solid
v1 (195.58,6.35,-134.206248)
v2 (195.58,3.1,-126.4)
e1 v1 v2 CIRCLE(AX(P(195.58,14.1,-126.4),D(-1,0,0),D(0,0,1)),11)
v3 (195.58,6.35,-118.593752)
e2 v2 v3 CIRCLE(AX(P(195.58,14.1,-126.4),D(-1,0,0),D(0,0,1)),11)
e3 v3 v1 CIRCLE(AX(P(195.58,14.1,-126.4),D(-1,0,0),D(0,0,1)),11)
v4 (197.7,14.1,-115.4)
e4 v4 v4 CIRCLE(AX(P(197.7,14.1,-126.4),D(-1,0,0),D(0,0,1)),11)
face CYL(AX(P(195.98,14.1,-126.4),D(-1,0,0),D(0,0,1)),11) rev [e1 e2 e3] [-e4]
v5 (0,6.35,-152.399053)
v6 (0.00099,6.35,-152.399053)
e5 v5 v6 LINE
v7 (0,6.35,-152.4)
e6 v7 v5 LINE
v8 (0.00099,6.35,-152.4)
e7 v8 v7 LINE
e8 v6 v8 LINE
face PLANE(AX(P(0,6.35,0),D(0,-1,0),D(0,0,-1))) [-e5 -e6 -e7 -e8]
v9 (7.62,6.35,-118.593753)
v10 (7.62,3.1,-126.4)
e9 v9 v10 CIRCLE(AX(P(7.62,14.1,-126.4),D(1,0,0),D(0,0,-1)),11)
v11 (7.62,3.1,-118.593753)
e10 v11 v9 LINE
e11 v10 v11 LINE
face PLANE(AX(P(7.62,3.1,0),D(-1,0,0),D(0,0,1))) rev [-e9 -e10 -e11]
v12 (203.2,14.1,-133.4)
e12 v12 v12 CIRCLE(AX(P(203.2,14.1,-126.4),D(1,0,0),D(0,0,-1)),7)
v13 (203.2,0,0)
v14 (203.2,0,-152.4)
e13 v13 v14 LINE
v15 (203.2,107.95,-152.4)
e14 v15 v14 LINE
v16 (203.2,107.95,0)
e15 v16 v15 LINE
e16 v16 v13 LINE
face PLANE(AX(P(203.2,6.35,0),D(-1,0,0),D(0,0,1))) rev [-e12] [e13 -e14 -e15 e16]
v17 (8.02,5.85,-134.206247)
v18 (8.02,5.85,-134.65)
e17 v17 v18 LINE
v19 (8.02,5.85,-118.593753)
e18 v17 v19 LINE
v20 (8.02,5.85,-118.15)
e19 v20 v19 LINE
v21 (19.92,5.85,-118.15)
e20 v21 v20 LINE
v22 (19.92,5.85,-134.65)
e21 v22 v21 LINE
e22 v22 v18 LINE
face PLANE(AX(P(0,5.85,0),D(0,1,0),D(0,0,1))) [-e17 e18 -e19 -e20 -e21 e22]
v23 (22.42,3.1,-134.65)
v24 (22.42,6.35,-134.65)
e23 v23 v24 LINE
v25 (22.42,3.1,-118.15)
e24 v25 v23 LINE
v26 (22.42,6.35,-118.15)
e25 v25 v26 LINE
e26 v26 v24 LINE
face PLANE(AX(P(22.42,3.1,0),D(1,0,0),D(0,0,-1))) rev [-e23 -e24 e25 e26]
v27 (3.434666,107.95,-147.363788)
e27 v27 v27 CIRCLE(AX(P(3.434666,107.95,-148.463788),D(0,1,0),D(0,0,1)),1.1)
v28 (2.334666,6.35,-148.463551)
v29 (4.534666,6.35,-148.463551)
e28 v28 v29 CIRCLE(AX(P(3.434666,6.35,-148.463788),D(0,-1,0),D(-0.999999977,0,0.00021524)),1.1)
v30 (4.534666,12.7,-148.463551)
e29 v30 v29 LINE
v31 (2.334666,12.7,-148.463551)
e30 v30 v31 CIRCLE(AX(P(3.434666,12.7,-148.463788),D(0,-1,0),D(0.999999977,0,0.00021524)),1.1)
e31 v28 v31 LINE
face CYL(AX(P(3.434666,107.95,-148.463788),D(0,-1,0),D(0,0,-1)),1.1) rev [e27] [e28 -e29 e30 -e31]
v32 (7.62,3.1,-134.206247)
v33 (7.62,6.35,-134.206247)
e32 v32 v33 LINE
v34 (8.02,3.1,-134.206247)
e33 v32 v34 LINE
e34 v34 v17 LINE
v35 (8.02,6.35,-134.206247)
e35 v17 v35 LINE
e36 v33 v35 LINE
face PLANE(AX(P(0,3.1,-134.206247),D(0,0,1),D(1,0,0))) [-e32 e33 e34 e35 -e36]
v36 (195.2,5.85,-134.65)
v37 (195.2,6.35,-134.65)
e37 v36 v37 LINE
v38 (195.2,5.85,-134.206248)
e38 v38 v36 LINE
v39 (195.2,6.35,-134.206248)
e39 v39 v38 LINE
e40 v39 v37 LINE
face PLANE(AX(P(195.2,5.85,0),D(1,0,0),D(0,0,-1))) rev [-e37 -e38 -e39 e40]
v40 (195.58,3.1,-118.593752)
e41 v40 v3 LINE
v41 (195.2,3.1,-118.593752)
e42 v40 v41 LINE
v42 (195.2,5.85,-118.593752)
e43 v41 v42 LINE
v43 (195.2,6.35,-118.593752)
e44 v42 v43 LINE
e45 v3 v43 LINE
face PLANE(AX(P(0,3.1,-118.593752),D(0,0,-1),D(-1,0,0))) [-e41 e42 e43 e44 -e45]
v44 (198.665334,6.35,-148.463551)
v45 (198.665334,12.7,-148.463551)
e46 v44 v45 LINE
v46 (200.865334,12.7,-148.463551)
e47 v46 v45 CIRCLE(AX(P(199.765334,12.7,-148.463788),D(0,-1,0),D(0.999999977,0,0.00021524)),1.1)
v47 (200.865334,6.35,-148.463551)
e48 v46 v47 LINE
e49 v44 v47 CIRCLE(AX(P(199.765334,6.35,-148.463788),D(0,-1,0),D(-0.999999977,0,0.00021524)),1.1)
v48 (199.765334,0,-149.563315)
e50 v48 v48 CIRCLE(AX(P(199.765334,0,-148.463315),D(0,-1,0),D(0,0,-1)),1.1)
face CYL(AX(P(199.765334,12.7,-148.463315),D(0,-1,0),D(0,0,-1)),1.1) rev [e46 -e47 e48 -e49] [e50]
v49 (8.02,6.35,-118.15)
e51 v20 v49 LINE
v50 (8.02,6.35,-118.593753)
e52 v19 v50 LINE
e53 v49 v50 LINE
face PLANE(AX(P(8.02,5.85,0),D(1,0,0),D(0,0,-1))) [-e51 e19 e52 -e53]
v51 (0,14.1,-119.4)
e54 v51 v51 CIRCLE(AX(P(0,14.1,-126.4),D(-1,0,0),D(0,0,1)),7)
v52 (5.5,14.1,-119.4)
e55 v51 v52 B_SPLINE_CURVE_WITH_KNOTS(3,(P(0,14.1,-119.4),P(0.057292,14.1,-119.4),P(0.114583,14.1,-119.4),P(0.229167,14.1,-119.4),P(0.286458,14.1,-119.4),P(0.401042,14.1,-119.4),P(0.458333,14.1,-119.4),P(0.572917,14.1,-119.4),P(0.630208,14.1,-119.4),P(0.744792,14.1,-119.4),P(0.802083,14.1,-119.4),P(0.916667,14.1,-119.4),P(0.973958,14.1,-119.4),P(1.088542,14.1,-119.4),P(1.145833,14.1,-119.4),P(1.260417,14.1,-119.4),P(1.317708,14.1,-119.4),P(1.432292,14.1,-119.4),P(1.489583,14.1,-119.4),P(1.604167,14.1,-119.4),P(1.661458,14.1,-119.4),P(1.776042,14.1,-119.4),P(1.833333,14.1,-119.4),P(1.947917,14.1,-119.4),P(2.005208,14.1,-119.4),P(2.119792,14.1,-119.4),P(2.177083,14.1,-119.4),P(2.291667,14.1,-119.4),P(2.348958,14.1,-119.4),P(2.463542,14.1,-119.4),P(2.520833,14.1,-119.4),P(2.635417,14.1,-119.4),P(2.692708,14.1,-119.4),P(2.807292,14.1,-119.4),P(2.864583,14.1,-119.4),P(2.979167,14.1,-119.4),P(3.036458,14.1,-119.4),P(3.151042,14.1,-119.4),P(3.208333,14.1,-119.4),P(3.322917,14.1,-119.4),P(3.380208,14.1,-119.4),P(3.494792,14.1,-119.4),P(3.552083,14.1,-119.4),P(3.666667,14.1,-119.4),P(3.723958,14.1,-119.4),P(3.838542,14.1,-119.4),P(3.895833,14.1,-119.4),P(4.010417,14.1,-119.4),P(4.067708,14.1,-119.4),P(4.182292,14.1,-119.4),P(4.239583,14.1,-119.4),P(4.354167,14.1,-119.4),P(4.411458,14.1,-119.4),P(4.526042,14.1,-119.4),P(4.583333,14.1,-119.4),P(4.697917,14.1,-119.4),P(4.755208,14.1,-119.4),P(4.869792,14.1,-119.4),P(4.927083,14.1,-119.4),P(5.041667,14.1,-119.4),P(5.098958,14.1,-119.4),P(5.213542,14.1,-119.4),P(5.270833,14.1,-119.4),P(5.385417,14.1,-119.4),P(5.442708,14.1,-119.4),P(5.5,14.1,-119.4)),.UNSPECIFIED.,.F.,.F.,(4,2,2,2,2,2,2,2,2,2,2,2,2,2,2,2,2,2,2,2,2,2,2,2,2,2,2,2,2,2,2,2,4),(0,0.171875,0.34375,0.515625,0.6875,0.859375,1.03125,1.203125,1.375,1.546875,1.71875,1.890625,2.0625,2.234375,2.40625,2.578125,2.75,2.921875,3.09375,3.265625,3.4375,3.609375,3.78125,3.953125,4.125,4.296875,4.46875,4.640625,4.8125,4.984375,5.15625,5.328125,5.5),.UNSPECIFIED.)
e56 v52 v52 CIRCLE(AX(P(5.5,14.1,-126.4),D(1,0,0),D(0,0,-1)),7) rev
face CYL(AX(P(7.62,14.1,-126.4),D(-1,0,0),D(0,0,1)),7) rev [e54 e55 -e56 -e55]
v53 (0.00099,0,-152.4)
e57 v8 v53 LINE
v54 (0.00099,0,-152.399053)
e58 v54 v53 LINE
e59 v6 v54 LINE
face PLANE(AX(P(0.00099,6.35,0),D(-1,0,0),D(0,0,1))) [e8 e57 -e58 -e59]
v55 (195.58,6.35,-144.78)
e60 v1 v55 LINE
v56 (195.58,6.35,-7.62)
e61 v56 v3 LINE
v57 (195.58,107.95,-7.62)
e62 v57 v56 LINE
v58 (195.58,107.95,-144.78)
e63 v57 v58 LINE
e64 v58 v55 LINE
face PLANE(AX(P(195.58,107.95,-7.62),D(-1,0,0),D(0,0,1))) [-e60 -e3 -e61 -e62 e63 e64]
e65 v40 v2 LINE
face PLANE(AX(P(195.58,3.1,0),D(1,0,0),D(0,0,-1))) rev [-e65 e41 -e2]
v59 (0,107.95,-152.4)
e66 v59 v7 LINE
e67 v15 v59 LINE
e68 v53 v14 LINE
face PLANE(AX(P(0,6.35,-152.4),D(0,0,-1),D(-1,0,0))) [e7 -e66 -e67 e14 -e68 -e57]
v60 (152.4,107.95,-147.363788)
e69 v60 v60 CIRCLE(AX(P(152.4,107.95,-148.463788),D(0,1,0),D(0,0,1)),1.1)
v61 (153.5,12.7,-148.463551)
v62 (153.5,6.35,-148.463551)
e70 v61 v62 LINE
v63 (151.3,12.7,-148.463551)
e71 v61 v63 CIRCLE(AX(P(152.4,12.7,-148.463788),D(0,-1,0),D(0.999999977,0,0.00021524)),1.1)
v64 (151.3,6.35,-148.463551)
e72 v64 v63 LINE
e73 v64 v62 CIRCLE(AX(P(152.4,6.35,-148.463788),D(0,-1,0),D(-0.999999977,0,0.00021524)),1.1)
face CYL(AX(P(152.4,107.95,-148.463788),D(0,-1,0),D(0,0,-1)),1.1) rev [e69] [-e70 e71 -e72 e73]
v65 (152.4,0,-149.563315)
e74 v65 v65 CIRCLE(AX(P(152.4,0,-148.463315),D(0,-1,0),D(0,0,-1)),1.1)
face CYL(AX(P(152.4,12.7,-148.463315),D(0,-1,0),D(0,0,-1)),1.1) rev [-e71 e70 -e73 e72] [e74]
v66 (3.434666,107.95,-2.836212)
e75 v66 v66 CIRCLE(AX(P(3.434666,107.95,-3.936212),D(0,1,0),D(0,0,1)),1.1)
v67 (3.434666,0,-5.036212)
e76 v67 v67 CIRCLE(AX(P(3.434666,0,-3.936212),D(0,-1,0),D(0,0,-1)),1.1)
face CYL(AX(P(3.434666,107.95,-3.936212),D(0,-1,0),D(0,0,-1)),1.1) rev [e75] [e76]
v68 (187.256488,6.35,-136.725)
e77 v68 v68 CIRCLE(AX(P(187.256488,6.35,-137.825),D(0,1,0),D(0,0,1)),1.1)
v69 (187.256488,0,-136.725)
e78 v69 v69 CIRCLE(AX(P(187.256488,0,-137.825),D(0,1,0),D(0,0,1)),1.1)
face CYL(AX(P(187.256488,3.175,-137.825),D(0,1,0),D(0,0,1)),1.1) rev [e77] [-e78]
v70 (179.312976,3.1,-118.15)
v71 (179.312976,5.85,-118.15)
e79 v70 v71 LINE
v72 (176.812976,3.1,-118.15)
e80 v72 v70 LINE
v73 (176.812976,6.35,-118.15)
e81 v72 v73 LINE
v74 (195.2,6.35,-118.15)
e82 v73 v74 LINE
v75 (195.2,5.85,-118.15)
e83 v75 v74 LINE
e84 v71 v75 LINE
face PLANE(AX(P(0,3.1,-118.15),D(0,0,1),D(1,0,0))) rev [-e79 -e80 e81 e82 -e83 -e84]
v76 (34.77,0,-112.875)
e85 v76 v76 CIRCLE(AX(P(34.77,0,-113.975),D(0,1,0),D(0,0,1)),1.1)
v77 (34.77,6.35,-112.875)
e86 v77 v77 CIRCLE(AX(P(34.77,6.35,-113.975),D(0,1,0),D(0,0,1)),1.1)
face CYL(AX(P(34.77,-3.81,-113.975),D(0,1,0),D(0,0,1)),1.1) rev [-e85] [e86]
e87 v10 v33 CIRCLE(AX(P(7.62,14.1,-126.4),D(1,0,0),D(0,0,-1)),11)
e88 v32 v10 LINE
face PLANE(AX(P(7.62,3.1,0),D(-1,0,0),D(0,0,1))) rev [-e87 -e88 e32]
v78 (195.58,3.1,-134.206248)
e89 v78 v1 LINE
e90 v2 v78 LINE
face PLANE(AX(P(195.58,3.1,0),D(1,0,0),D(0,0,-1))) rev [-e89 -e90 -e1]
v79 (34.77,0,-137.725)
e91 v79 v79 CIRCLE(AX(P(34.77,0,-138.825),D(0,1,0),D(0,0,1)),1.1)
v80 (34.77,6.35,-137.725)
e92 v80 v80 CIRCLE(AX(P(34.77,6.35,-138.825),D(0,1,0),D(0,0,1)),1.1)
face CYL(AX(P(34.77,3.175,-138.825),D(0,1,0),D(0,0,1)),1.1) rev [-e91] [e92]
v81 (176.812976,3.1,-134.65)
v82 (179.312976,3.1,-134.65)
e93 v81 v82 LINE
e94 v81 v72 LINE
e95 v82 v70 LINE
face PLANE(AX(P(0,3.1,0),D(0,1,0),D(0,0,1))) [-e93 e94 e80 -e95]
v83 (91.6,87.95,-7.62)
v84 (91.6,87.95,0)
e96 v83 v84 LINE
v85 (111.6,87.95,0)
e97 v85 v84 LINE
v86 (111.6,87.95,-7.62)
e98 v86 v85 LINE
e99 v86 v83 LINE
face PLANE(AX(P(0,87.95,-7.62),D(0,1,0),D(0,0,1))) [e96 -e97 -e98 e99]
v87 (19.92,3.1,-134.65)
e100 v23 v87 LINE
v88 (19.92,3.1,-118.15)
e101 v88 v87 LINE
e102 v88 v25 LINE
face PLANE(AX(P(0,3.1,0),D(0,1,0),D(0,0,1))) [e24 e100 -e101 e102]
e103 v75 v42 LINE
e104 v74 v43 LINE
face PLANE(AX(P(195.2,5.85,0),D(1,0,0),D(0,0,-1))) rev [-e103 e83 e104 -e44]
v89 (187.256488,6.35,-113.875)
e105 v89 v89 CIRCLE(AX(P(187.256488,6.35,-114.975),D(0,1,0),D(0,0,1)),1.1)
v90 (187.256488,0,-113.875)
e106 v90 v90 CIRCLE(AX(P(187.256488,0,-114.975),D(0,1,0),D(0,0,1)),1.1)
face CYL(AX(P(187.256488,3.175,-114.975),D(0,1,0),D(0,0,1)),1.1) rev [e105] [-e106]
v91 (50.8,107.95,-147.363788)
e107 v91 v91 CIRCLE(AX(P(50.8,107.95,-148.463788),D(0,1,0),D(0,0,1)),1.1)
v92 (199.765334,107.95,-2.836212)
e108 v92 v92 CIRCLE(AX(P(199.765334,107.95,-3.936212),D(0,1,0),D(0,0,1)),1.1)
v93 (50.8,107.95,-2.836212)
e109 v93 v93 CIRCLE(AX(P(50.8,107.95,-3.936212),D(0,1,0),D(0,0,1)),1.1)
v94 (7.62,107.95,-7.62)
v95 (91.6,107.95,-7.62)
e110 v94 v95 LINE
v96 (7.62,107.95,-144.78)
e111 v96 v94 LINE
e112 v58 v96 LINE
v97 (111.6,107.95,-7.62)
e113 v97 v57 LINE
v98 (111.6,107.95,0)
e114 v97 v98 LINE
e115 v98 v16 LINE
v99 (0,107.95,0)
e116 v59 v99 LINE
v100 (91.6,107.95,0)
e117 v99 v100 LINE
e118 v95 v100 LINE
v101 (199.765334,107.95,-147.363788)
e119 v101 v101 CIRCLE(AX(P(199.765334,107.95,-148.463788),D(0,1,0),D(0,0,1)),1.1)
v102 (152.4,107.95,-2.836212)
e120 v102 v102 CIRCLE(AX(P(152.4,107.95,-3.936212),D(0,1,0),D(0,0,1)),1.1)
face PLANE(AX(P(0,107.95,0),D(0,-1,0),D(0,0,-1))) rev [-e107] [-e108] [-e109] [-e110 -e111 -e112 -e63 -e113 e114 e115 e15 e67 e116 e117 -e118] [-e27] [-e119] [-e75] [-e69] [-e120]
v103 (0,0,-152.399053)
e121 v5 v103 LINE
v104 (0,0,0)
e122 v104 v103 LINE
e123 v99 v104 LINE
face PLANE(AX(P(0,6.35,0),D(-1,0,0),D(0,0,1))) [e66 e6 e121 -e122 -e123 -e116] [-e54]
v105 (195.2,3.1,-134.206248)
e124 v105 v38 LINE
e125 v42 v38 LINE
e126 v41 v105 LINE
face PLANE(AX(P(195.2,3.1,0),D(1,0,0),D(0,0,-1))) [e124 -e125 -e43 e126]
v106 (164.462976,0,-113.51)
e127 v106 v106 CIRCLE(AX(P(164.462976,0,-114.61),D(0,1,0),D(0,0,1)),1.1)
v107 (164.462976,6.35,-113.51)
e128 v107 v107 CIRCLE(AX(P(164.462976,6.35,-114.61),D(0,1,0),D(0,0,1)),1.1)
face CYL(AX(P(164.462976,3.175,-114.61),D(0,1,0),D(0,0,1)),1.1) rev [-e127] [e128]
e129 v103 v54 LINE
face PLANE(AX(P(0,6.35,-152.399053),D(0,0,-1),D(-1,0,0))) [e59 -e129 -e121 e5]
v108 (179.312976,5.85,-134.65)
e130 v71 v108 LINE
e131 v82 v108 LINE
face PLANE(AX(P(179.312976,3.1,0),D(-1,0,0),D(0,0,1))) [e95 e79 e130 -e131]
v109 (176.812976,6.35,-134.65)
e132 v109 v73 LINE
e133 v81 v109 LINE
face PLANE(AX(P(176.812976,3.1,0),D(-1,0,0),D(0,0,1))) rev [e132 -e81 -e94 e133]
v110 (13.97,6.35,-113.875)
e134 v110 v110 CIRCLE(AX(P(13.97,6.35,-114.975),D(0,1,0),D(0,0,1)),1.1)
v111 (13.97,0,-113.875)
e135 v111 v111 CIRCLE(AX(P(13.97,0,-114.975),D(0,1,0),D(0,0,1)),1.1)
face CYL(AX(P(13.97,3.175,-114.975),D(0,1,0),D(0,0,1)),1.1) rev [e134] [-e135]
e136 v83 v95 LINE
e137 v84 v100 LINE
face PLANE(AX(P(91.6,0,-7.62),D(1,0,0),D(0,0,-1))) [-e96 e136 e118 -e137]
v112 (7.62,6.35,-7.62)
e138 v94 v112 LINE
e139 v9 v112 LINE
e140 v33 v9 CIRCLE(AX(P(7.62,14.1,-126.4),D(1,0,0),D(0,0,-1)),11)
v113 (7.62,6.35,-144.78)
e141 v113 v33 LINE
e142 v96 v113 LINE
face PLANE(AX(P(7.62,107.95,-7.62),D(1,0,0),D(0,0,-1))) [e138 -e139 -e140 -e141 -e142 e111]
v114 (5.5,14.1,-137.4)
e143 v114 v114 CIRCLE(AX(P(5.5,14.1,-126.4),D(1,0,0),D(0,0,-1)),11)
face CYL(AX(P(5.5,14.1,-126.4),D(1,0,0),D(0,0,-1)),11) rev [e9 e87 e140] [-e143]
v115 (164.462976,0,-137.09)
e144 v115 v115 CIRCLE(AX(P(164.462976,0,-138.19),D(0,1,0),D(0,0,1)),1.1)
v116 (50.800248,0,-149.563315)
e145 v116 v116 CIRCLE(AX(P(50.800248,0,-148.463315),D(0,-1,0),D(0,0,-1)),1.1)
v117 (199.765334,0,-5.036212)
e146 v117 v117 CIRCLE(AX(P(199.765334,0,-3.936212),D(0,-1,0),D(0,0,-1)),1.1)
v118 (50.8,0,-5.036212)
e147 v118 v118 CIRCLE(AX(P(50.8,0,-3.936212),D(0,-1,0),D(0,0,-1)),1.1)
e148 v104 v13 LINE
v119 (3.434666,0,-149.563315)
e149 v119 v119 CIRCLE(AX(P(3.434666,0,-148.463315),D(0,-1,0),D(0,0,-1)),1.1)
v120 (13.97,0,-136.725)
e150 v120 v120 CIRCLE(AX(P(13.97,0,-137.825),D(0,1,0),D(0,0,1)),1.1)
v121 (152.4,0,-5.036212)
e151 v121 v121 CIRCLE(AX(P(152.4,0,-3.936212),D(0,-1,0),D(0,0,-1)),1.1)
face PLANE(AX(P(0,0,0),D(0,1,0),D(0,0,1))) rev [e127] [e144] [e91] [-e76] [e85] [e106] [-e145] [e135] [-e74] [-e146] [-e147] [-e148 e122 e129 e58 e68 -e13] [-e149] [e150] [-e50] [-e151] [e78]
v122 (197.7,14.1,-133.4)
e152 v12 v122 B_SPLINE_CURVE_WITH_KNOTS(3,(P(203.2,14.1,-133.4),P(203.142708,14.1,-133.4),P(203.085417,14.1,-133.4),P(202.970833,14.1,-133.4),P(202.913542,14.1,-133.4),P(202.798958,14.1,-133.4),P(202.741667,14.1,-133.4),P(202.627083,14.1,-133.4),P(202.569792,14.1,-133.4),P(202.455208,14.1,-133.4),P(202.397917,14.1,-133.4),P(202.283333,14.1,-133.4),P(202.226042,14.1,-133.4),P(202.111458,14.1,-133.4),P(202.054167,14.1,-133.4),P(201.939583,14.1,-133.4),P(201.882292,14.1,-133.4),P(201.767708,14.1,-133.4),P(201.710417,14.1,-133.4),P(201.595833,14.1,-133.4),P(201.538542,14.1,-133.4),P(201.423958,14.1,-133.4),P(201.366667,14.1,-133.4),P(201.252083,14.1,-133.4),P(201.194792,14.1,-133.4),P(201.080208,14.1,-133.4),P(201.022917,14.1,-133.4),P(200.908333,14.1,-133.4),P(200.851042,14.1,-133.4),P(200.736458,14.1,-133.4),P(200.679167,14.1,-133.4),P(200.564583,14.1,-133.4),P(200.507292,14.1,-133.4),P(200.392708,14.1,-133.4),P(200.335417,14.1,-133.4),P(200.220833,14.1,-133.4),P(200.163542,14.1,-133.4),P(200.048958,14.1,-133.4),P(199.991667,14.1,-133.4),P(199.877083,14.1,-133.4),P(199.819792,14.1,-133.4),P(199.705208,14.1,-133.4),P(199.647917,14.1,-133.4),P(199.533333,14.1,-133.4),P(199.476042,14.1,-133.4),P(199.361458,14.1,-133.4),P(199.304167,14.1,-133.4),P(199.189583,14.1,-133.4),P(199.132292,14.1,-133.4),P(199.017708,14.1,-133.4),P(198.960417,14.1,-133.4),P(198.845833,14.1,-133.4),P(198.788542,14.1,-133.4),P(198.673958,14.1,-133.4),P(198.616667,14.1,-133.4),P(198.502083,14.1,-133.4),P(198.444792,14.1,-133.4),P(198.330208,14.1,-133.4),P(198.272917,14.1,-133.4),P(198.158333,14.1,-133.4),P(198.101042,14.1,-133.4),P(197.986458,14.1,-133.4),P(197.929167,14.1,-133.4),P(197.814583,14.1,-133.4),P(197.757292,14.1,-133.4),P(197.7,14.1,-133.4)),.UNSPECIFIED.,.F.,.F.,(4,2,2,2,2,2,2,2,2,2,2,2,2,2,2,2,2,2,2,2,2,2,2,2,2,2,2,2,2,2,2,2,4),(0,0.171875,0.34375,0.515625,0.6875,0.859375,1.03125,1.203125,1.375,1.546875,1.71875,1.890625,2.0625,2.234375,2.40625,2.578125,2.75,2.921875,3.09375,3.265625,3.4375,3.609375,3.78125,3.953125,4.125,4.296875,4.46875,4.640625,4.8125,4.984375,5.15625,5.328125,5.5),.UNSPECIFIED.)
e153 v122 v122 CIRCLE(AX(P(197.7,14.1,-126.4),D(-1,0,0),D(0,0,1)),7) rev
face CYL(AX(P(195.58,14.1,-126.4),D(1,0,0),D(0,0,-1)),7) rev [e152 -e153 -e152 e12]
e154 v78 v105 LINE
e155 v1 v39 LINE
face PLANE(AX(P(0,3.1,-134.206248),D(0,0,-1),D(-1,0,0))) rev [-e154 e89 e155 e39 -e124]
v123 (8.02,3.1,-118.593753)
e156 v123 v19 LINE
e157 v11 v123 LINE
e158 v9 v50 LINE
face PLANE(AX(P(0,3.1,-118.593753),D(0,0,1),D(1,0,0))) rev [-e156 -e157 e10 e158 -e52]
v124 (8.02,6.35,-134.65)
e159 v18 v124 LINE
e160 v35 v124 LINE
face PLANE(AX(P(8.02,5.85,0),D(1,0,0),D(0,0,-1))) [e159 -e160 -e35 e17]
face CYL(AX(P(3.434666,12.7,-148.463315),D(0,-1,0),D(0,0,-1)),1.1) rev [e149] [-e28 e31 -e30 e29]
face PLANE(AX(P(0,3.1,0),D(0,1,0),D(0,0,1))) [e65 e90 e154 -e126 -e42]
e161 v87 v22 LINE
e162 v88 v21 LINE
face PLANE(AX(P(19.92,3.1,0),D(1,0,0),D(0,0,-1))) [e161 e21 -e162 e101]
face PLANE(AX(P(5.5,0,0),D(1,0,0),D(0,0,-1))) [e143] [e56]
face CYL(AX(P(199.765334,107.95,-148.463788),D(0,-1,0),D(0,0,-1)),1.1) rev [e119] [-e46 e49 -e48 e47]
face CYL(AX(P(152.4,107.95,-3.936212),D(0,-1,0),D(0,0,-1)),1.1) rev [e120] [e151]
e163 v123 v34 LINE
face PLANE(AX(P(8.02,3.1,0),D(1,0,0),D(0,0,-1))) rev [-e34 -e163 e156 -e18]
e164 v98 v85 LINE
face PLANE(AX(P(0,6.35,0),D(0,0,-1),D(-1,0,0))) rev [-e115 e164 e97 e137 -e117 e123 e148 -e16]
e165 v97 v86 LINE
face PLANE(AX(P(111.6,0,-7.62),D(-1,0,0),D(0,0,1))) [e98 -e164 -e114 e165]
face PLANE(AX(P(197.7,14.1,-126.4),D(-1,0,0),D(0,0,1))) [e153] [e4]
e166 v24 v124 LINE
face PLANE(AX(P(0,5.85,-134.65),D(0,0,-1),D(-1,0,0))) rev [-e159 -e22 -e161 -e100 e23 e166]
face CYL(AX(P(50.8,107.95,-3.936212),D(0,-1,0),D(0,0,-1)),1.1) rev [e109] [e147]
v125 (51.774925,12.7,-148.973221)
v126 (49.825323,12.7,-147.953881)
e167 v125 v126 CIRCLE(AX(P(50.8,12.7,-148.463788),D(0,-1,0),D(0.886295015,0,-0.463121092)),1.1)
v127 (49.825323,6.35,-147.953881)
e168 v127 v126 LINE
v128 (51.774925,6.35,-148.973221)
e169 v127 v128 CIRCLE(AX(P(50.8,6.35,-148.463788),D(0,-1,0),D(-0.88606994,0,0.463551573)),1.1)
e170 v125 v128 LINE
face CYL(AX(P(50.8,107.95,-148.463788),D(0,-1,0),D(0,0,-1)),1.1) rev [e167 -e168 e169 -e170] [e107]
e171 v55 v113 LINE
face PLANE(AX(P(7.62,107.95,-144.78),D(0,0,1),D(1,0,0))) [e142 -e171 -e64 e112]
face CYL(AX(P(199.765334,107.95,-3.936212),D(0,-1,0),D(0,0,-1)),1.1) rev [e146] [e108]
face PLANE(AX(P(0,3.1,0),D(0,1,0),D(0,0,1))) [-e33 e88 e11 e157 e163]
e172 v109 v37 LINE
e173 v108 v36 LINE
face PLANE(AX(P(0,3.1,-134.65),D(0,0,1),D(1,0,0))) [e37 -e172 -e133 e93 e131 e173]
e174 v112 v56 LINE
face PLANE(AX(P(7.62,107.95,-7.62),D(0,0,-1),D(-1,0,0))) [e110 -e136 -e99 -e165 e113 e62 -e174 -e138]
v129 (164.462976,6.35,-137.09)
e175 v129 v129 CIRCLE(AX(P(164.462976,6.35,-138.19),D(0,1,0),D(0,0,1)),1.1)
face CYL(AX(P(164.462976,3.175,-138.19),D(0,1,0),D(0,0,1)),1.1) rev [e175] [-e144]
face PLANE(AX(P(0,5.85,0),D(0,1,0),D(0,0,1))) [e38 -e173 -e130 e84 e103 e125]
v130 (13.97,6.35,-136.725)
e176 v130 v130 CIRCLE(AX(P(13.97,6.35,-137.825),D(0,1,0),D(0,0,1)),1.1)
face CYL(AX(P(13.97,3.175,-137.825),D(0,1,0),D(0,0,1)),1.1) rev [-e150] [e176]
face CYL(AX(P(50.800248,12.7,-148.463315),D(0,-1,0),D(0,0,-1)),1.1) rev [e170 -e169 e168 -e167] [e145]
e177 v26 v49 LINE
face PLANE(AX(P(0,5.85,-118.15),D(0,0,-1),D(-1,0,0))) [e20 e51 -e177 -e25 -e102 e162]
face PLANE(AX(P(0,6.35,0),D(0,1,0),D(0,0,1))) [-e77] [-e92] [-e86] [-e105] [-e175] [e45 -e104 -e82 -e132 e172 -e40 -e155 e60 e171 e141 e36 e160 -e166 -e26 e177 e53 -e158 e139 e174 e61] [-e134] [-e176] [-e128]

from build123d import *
from build123d.topology import SkipClean

# Parameters (mm, degrees)
BOSS_EXTRUDE1_DEPTH     = 6.35
SKETCH2_W               = 203.2
SKETCH2_H               = 152.4
SKETCH2_R               = 1.1
SKETCH2_W_2             = 187.96
SKETCH2_H_2             = 137.16
BOSS_EXTRUDE2_DEPTH     = 101.6
SKETCH3_R               = 1.1
CUT_EXTRUDE1_DEPTH      = 12.7
CUT_EXTRUDE2_DEPTH      = 7.62
SKETCH6_R               = 11
CUT_EXTRUDE3_DEPTH      = 0.4
CUT_EXTRUDE6_DEPTH      = 3.25
SKETCH6_3_R             = 11
CUT_EXTRUDE16_DEPTH     = 2.12
CUT_EXTRUDE17_DEPTH     = 3.25
CUT_EXTRUDE18_DEPTH     = 0.5
SKETCH7_8_R             = 1.1
CUT_EXTRUDE10_DEPTH     = 3.175
CUT_EXTRUDE22_START     = -7.62
CUT_EXTRUDE22_DEPTH     = 7.62
CUT_EXTRUDE24_DEPTH     = 2.12
SKETCH20_W              = 0.4
SKETCH20_H              = 15.612494996
CUT_EXTRUDE26_DEPTH     = 3.25
CUT_EXTRUDE27_DEPTH     = 0.5
CUT_EXTRUDE28_DEPTH     = 3.25
SKETCH20_7_R            = 1.1
CUT_EXTRUDE29_DEPTH     = 3.175
SKETCH21_W              = 10
SKETCH21_H              = 20
CUT_EXTRUDE31_DEPTH     = 7.62
CUT_EXTRUDE32_START     = -6.35
CUT_EXTRUDE32_OUTLINE_R = 1.1
CUT_EXTRUDE32_DEPTH     = 3.175
CUT_EXTRUDE33_START     = -6.35
CUT_EXTRUDE33_OUTLINE_R = 1.1
CUT_EXTRUDE33_DEPTH     = 3.175
SKETCH20_9_R            = 1.1
CUT_EXTRUDE34_DEPTH     = 10.16


# Read off the part's stored shape, not the designer's step: Cut-Extrude32, Cut-Extrude33
with BuildPart() as part:
    # Sketch1 → Boss-Extrude1 (new body)
    with BuildSketch(Plane(origin=(0, 0, 0), x_dir=(1, 0, 0), z_dir=(0, 1, 0))):
        Polygon((0.000990329, 152.399052943), (0, 152.399052943), (0, 0), (203.2, 0), (203.2, 152.4), (0.000990329, 152.4), align=None)
    extrude(amount=BOSS_EXTRUDE1_DEPTH)

    # Sketch2 → Boss-Extrude2 (add)
    with BuildSketch(Plane(origin=(0, 6.35, 0), x_dir=(1, 0, 0), z_dir=(0, 1, 0))):
        with Locations((101.6, 76.2)):
            Rectangle(SKETCH2_W, SKETCH2_H)
        with Locations(Location((3.434665978, 148.463788162, 0), (0, 0, 270))):
            Circle(SKETCH2_R, mode=Mode.SUBTRACT)
        with Locations(Location((50.8, 148.463788162, 0), (0, 0, 270))):
            Circle(SKETCH2_R, mode=Mode.SUBTRACT)
        with Locations(Location((199.765334022, 148.463788162, 0), (0, 0, 270))):
            Circle(SKETCH2_R, mode=Mode.SUBTRACT)
        with Locations(Location((152.4, 148.463788162, 0), (0, 0, 270))):
            Circle(SKETCH2_R, mode=Mode.SUBTRACT)
        with Locations(Location((3.434665978, 3.936211838, 0), (0, 0, 270))):
            Circle(SKETCH2_R, mode=Mode.SUBTRACT)
        with Locations(Location((50.8, 3.936211838, 0), (0, 0, 270))):
            Circle(SKETCH2_R, mode=Mode.SUBTRACT)
        with Locations(Location((199.765334022, 3.936211838, 0), (0, 0, 270))):
            Circle(SKETCH2_R, mode=Mode.SUBTRACT)
        with Locations(Location((152.4, 3.936211838, 0), (0, 0, 270))):
            Circle(SKETCH2_R, mode=Mode.SUBTRACT)
        with Locations((101.6, 76.2)):
            Rectangle(SKETCH2_W_2, SKETCH2_H_2, mode=Mode.SUBTRACT)
    extrude(amount=BOSS_EXTRUDE2_DEPTH)

    # Sketch3 → Cut-Extrude1 (cut)
    with SkipClean():  # the faces are left unmerged after this step: merging them gives an invalid solid
        with BuildSketch(Plane.XZ):
            with Locations(Location((3.434665978, -3.936211838, 0), (0, 0, 270))):
                Circle(SKETCH3_R)
            with Locations(Location((50.8, -3.936211838, 0), (0, 0, 270))):
                Circle(SKETCH3_R)
            with Locations(Location((152.4, -3.936211838, 0), (0, 0, 270))):
                Circle(SKETCH3_R)
            with Locations(Location((199.765334022, -3.936211838, 0), (0, 0, 270))):
                Circle(SKETCH3_R)
            with Locations(Location((50.800247582, -148.463314633, 0), (0, 0, 270))):
                Circle(SKETCH3_R)
            with Locations(Location((3.434665978, -148.463314633, 0), (0, 0, 270))):
                Circle(SKETCH3_R)
            with Locations(Location((152.4, -148.463314633, 0), (0, 0, 270))):
                Circle(SKETCH3_R)
            with Locations(Location((199.765334022, -148.463314633, 0), (0, 0, 270))):
                Circle(SKETCH3_R)
        extrude(amount=-CUT_EXTRUDE1_DEPTH, mode=Mode.SUBTRACT)
    add(part.part.scale(1), mode=Mode.REPLACE)  # the faces are merged on a copy

    # Sketch5 → Cut-Extrude2 (cut)
    with BuildSketch(Plane(origin=(203.2, 0, 0), x_dir=(0, 0, -1), z_dir=(1, 0, 0))):
        with BuildLine():
            ThreePointArc((126.4, 7.09999974), (131.349747468, 9.150252272), (133.4, 14.09999974))
            Line((133.4, 14.09999974), (126.4, 14.09999974))
            Line((126.4, 14.09999974), (126.4, 7.09999974))
        make_face()
        with BuildLine():
            Line((126.4, 14.09999974), (133.4, 14.09999974))
            ThreePointArc((133.4, 14.09999974), (121.450252532, 19.049747208), (126.4, 7.09999974))
            Line((126.4, 7.09999974), (126.4, 14.09999974))
        make_face()
    extrude(amount=-CUT_EXTRUDE2_DEPTH, mode=Mode.SUBTRACT)

    # Sketch6 → Cut-Extrude3 (cut)
    with BuildSketch(Plane.ZY.offset(-195.58)):
        with Locations((-126.4, 14.09999974)):
            Circle(SKETCH6_R)
    extrude(amount=-CUT_EXTRUDE3_DEPTH, mode=Mode.SUBTRACT)

    # Sketch7 → Cut-Extrude6 (cut)
    with BuildSketch(Plane(origin=(0, 6.35, 0), x_dir=(1, 0, 0), z_dir=(0, 1, 0))):
        Polygon((176.812976287, 126.4), (176.812976287, 118.15), (179.312976287, 118.15), (179.312976287, 126.4), (179.312976287, 134.65), (176.812976287, 134.65), align=None)
    extrude(amount=-CUT_EXTRUDE6_DEPTH, mode=Mode.SUBTRACT)

    # Sketch6<3> → Cut-Extrude16 (cut)
    with BuildSketch(Plane.ZY.offset(-195.58)):
        with Locations((-126.4, 14.09999974)):
            Circle(SKETCH6_3_R)
    extrude(amount=-CUT_EXTRUDE16_DEPTH, mode=Mode.SUBTRACT)

    # Sketch7<9> → Cut-Extrude17 (cut)
    with BuildSketch(Plane(origin=(0, 6.35, 0), x_dir=(1, 0, 0), z_dir=(0, 1, 0))):
        Polygon((195.2, 118.593752244), (195.2, 126.4), (195.2, 134.206247756), (195.58, 134.206247756), (195.58, 118.593752244), align=None)
    extrude(amount=-CUT_EXTRUDE17_DEPTH, mode=Mode.SUBTRACT)

    # Sketch7<10> → Cut-Extrude18 (cut)
    with BuildSketch(Plane(origin=(0, 6.35, 0), x_dir=(1, 0, 0), z_dir=(0, 1, 0))):
        Polygon((179.312976287, 118.15), (195.2, 118.15), (195.2, 118.593752244), (195.2, 126.4), (195.2, 134.206247756), (195.2, 134.65), (179.312976287, 134.65), (179.312976287, 126.4), align=None)
    extrude(amount=-CUT_EXTRUDE18_DEPTH, mode=Mode.SUBTRACT)

    # Sketch7<8> → Cut-Extrude10 (cut)
    with BuildSketch(Plane(origin=(0, 6.35, 0), x_dir=(1, 0, 0), z_dir=(0, 1, 0))):
        with Locations(Location((187.256488143, 137.825, 0), (0, 0, 270))):
            Circle(SKETCH7_8_R)
        with Locations(Location((187.256488143, 114.975, 0), (0, 0, 270))):
            Circle(SKETCH7_8_R)
        with Locations(Location((164.462976287, 138.19, 0), (0, 0, 270))):
            Circle(SKETCH7_8_R)
        with Locations(Location((164.462976287, 114.61, 0), (0, 0, 270))):
            Circle(SKETCH7_8_R)
    extrude(amount=-CUT_EXTRUDE10_DEPTH, mode=Mode.SUBTRACT)

    # Sketch17 → Cut-Extrude22 (cut)
    with BuildSketch(Plane.ZY.offset(CUT_EXTRUDE22_START)):
        with BuildLine():
            ThreePointArc((-119.4, 14.1), (-126.4, 21.1), (-133.4, 14.1))
            Line((-133.4, 14.1), (-126.4, 14.1))
            Line((-126.4, 14.1), (-126.4, 7.1))
            ThreePointArc((-126.4, 7.1), (-121.450252532, 9.150252532), (-119.4, 14.1))
        make_face()
        with BuildLine():
            Line((-126.4, 14.1), (-133.4, 14.1))
            ThreePointArc((-133.4, 14.1), (-131.349747468, 9.150252532), (-126.4, 7.1))
            Line((-126.4, 7.1), (-126.4, 14.1))
        make_face()
    extrude(amount=CUT_EXTRUDE22_DEPTH, mode=Mode.SUBTRACT)

    # Sketch18 → Cut-Extrude24 (cut)
    # profile 1 of 2: a face of its own
    with BuildSketch(Plane(origin=(7.62, 0, 0), x_dir=(0, 0, -1), z_dir=(1, 0, 0))):
        with BuildLine():
            ThreePointArc((134.206247498, 6.35), (136.570268494, 9.908861878), (137.4, 14.1))
            ThreePointArc((137.4, 14.1), (122.208861878, 24.270268494), (118.593752502, 6.35))
            Line((118.593752502, 6.35), (134.206247498, 6.35))
        make_face()
        with BuildLine():
            ThreePointArc((133.4, 14.1), (131.349747468, 9.150252532), (126.4, 7.1))
            ThreePointArc((126.4, 7.1), (119.4, 14.1), (126.4, 21.1))
            ThreePointArc((126.4, 21.1), (131.349747468, 19.049747468), (133.4, 14.1))
        make_face(mode=Mode.SUBTRACT)
    # profile 2 of 2: a face of its own
    with BuildSketch(Plane(origin=(7.62, 0, 0), x_dir=(0, 0, -1), z_dir=(1, 0, 0))):
        with BuildLine():
            Line((134.206247498, 6.35), (118.593752502, 6.35))
            ThreePointArc((118.593752502, 6.35), (126.4, 3.1), (134.206247498, 6.35))
        make_face()
    extrude(amount=-CUT_EXTRUDE24_DEPTH, mode=Mode.SUBTRACT)

    # Sketch20 → Cut-Extrude26 (cut)
    with BuildSketch(Plane(origin=(0, 6.35, 0), x_dir=(1, 0, 0), z_dir=(0, 1, 0))):
        with Locations((7.82, 126.4)):
            Rectangle(SKETCH20_W, SKETCH20_H)
    extrude(amount=-CUT_EXTRUDE26_DEPTH, mode=Mode.SUBTRACT)

    # Sketch20<4> → Cut-Extrude27 (cut)
    with BuildSketch(Plane(origin=(0, 6.35, 0), x_dir=(1, 0, 0), z_dir=(0, 1, 0))):
        Polygon((8.02, 118.15), (8.02, 118.593752502), (8.02, 134.206247498), (8.02, 134.65), (19.92, 134.65), (19.92, 126.4), (19.92, 118.15), align=None)
    extrude(amount=-CUT_EXTRUDE27_DEPTH, mode=Mode.SUBTRACT)

    # Sketch20<5> → Cut-Extrude28 (cut)
    with BuildSketch(Plane(origin=(0, 6.35, 0), x_dir=(1, 0, 0), z_dir=(0, 1, 0))):
        Polygon((19.92, 118.15), (22.42, 118.15), (22.42, 126.4), (22.42, 134.65), (19.92, 134.65), (19.92, 126.4), align=None)
    extrude(amount=-CUT_EXTRUDE28_DEPTH, mode=Mode.SUBTRACT)

    # Sketch20<7> → Cut-Extrude29 (cut)
    with BuildSketch(Plane(origin=(0, 6.35, 0), x_dir=(1, 0, 0), z_dir=(0, 1, 0))):
        with Locations(Location((13.97, 137.825, 0), (0, 0, 270))):
            Circle(SKETCH20_7_R)
        with Locations(Location((13.97, 114.975, 0), (0, 0, 270))):
            Circle(SKETCH20_7_R)
        with Locations(Location((34.77, 138.825, 0), (0, 0, 270))):
            Circle(SKETCH20_7_R)
    extrude(amount=-CUT_EXTRUDE29_DEPTH, mode=Mode.SUBTRACT)

    # Sketch21 → Cut-Extrude31 (cut)
    with BuildSketch(Plane.XY):
        with Locations((96.6, 97.95)):
            Rectangle(SKETCH21_W, SKETCH21_H)
        Polygon((111.6, 107.95), (101.6, 107.95), (101.6, 87.95), (111.6, 87.95), (111.6, 88.914389003), align=None)
    extrude(amount=-CUT_EXTRUDE31_DEPTH, mode=Mode.SUBTRACT)

    # Cut-Extrude32 outline → Cut-Extrude32 (cut)
    with BuildSketch(Plane(origin=(0, 6.35, 0), x_dir=(1, 0, 0), z_dir=(0, 1, 0)).offset(CUT_EXTRUDE32_START)):
        with Locations((13.97, 137.825)):
            Circle(CUT_EXTRUDE32_OUTLINE_R)
        with Locations((34.77, 138.825)):
            Circle(CUT_EXTRUDE32_OUTLINE_R)
        with Locations((13.97, 114.975)):
            Circle(CUT_EXTRUDE32_OUTLINE_R)
    extrude(amount=CUT_EXTRUDE32_DEPTH, mode=Mode.SUBTRACT)

    # Cut-Extrude33 outline → Cut-Extrude33 (cut)
    with BuildSketch(Plane(origin=(0, 6.35, 0), x_dir=(1, 0, 0), z_dir=(0, 1, 0)).offset(CUT_EXTRUDE33_START)):
        with Locations((164.462976287, 138.19)):
            Circle(CUT_EXTRUDE33_OUTLINE_R)
        with Locations((164.462976287, 114.61)):
            Circle(CUT_EXTRUDE33_OUTLINE_R)
        with Locations((187.256488143, 114.975)):
            Circle(CUT_EXTRUDE33_OUTLINE_R)
        with Locations((187.256488143, 137.825)):
            Circle(CUT_EXTRUDE33_OUTLINE_R)
    extrude(amount=CUT_EXTRUDE33_DEPTH, mode=Mode.SUBTRACT)

    # Sketch20<9> → Cut-Extrude34 (cut)
    with BuildSketch(Plane(origin=(0, 6.35, 0), x_dir=(1, 0, 0), z_dir=(0, 1, 0))):
        with Locations(Location((34.77, 113.975, 0), (0, 0, 270))):
            Circle(SKETCH20_9_R)
    extrude(amount=-CUT_EXTRUDE34_DEPTH, mode=Mode.SUBTRACT)


solid = part.part
